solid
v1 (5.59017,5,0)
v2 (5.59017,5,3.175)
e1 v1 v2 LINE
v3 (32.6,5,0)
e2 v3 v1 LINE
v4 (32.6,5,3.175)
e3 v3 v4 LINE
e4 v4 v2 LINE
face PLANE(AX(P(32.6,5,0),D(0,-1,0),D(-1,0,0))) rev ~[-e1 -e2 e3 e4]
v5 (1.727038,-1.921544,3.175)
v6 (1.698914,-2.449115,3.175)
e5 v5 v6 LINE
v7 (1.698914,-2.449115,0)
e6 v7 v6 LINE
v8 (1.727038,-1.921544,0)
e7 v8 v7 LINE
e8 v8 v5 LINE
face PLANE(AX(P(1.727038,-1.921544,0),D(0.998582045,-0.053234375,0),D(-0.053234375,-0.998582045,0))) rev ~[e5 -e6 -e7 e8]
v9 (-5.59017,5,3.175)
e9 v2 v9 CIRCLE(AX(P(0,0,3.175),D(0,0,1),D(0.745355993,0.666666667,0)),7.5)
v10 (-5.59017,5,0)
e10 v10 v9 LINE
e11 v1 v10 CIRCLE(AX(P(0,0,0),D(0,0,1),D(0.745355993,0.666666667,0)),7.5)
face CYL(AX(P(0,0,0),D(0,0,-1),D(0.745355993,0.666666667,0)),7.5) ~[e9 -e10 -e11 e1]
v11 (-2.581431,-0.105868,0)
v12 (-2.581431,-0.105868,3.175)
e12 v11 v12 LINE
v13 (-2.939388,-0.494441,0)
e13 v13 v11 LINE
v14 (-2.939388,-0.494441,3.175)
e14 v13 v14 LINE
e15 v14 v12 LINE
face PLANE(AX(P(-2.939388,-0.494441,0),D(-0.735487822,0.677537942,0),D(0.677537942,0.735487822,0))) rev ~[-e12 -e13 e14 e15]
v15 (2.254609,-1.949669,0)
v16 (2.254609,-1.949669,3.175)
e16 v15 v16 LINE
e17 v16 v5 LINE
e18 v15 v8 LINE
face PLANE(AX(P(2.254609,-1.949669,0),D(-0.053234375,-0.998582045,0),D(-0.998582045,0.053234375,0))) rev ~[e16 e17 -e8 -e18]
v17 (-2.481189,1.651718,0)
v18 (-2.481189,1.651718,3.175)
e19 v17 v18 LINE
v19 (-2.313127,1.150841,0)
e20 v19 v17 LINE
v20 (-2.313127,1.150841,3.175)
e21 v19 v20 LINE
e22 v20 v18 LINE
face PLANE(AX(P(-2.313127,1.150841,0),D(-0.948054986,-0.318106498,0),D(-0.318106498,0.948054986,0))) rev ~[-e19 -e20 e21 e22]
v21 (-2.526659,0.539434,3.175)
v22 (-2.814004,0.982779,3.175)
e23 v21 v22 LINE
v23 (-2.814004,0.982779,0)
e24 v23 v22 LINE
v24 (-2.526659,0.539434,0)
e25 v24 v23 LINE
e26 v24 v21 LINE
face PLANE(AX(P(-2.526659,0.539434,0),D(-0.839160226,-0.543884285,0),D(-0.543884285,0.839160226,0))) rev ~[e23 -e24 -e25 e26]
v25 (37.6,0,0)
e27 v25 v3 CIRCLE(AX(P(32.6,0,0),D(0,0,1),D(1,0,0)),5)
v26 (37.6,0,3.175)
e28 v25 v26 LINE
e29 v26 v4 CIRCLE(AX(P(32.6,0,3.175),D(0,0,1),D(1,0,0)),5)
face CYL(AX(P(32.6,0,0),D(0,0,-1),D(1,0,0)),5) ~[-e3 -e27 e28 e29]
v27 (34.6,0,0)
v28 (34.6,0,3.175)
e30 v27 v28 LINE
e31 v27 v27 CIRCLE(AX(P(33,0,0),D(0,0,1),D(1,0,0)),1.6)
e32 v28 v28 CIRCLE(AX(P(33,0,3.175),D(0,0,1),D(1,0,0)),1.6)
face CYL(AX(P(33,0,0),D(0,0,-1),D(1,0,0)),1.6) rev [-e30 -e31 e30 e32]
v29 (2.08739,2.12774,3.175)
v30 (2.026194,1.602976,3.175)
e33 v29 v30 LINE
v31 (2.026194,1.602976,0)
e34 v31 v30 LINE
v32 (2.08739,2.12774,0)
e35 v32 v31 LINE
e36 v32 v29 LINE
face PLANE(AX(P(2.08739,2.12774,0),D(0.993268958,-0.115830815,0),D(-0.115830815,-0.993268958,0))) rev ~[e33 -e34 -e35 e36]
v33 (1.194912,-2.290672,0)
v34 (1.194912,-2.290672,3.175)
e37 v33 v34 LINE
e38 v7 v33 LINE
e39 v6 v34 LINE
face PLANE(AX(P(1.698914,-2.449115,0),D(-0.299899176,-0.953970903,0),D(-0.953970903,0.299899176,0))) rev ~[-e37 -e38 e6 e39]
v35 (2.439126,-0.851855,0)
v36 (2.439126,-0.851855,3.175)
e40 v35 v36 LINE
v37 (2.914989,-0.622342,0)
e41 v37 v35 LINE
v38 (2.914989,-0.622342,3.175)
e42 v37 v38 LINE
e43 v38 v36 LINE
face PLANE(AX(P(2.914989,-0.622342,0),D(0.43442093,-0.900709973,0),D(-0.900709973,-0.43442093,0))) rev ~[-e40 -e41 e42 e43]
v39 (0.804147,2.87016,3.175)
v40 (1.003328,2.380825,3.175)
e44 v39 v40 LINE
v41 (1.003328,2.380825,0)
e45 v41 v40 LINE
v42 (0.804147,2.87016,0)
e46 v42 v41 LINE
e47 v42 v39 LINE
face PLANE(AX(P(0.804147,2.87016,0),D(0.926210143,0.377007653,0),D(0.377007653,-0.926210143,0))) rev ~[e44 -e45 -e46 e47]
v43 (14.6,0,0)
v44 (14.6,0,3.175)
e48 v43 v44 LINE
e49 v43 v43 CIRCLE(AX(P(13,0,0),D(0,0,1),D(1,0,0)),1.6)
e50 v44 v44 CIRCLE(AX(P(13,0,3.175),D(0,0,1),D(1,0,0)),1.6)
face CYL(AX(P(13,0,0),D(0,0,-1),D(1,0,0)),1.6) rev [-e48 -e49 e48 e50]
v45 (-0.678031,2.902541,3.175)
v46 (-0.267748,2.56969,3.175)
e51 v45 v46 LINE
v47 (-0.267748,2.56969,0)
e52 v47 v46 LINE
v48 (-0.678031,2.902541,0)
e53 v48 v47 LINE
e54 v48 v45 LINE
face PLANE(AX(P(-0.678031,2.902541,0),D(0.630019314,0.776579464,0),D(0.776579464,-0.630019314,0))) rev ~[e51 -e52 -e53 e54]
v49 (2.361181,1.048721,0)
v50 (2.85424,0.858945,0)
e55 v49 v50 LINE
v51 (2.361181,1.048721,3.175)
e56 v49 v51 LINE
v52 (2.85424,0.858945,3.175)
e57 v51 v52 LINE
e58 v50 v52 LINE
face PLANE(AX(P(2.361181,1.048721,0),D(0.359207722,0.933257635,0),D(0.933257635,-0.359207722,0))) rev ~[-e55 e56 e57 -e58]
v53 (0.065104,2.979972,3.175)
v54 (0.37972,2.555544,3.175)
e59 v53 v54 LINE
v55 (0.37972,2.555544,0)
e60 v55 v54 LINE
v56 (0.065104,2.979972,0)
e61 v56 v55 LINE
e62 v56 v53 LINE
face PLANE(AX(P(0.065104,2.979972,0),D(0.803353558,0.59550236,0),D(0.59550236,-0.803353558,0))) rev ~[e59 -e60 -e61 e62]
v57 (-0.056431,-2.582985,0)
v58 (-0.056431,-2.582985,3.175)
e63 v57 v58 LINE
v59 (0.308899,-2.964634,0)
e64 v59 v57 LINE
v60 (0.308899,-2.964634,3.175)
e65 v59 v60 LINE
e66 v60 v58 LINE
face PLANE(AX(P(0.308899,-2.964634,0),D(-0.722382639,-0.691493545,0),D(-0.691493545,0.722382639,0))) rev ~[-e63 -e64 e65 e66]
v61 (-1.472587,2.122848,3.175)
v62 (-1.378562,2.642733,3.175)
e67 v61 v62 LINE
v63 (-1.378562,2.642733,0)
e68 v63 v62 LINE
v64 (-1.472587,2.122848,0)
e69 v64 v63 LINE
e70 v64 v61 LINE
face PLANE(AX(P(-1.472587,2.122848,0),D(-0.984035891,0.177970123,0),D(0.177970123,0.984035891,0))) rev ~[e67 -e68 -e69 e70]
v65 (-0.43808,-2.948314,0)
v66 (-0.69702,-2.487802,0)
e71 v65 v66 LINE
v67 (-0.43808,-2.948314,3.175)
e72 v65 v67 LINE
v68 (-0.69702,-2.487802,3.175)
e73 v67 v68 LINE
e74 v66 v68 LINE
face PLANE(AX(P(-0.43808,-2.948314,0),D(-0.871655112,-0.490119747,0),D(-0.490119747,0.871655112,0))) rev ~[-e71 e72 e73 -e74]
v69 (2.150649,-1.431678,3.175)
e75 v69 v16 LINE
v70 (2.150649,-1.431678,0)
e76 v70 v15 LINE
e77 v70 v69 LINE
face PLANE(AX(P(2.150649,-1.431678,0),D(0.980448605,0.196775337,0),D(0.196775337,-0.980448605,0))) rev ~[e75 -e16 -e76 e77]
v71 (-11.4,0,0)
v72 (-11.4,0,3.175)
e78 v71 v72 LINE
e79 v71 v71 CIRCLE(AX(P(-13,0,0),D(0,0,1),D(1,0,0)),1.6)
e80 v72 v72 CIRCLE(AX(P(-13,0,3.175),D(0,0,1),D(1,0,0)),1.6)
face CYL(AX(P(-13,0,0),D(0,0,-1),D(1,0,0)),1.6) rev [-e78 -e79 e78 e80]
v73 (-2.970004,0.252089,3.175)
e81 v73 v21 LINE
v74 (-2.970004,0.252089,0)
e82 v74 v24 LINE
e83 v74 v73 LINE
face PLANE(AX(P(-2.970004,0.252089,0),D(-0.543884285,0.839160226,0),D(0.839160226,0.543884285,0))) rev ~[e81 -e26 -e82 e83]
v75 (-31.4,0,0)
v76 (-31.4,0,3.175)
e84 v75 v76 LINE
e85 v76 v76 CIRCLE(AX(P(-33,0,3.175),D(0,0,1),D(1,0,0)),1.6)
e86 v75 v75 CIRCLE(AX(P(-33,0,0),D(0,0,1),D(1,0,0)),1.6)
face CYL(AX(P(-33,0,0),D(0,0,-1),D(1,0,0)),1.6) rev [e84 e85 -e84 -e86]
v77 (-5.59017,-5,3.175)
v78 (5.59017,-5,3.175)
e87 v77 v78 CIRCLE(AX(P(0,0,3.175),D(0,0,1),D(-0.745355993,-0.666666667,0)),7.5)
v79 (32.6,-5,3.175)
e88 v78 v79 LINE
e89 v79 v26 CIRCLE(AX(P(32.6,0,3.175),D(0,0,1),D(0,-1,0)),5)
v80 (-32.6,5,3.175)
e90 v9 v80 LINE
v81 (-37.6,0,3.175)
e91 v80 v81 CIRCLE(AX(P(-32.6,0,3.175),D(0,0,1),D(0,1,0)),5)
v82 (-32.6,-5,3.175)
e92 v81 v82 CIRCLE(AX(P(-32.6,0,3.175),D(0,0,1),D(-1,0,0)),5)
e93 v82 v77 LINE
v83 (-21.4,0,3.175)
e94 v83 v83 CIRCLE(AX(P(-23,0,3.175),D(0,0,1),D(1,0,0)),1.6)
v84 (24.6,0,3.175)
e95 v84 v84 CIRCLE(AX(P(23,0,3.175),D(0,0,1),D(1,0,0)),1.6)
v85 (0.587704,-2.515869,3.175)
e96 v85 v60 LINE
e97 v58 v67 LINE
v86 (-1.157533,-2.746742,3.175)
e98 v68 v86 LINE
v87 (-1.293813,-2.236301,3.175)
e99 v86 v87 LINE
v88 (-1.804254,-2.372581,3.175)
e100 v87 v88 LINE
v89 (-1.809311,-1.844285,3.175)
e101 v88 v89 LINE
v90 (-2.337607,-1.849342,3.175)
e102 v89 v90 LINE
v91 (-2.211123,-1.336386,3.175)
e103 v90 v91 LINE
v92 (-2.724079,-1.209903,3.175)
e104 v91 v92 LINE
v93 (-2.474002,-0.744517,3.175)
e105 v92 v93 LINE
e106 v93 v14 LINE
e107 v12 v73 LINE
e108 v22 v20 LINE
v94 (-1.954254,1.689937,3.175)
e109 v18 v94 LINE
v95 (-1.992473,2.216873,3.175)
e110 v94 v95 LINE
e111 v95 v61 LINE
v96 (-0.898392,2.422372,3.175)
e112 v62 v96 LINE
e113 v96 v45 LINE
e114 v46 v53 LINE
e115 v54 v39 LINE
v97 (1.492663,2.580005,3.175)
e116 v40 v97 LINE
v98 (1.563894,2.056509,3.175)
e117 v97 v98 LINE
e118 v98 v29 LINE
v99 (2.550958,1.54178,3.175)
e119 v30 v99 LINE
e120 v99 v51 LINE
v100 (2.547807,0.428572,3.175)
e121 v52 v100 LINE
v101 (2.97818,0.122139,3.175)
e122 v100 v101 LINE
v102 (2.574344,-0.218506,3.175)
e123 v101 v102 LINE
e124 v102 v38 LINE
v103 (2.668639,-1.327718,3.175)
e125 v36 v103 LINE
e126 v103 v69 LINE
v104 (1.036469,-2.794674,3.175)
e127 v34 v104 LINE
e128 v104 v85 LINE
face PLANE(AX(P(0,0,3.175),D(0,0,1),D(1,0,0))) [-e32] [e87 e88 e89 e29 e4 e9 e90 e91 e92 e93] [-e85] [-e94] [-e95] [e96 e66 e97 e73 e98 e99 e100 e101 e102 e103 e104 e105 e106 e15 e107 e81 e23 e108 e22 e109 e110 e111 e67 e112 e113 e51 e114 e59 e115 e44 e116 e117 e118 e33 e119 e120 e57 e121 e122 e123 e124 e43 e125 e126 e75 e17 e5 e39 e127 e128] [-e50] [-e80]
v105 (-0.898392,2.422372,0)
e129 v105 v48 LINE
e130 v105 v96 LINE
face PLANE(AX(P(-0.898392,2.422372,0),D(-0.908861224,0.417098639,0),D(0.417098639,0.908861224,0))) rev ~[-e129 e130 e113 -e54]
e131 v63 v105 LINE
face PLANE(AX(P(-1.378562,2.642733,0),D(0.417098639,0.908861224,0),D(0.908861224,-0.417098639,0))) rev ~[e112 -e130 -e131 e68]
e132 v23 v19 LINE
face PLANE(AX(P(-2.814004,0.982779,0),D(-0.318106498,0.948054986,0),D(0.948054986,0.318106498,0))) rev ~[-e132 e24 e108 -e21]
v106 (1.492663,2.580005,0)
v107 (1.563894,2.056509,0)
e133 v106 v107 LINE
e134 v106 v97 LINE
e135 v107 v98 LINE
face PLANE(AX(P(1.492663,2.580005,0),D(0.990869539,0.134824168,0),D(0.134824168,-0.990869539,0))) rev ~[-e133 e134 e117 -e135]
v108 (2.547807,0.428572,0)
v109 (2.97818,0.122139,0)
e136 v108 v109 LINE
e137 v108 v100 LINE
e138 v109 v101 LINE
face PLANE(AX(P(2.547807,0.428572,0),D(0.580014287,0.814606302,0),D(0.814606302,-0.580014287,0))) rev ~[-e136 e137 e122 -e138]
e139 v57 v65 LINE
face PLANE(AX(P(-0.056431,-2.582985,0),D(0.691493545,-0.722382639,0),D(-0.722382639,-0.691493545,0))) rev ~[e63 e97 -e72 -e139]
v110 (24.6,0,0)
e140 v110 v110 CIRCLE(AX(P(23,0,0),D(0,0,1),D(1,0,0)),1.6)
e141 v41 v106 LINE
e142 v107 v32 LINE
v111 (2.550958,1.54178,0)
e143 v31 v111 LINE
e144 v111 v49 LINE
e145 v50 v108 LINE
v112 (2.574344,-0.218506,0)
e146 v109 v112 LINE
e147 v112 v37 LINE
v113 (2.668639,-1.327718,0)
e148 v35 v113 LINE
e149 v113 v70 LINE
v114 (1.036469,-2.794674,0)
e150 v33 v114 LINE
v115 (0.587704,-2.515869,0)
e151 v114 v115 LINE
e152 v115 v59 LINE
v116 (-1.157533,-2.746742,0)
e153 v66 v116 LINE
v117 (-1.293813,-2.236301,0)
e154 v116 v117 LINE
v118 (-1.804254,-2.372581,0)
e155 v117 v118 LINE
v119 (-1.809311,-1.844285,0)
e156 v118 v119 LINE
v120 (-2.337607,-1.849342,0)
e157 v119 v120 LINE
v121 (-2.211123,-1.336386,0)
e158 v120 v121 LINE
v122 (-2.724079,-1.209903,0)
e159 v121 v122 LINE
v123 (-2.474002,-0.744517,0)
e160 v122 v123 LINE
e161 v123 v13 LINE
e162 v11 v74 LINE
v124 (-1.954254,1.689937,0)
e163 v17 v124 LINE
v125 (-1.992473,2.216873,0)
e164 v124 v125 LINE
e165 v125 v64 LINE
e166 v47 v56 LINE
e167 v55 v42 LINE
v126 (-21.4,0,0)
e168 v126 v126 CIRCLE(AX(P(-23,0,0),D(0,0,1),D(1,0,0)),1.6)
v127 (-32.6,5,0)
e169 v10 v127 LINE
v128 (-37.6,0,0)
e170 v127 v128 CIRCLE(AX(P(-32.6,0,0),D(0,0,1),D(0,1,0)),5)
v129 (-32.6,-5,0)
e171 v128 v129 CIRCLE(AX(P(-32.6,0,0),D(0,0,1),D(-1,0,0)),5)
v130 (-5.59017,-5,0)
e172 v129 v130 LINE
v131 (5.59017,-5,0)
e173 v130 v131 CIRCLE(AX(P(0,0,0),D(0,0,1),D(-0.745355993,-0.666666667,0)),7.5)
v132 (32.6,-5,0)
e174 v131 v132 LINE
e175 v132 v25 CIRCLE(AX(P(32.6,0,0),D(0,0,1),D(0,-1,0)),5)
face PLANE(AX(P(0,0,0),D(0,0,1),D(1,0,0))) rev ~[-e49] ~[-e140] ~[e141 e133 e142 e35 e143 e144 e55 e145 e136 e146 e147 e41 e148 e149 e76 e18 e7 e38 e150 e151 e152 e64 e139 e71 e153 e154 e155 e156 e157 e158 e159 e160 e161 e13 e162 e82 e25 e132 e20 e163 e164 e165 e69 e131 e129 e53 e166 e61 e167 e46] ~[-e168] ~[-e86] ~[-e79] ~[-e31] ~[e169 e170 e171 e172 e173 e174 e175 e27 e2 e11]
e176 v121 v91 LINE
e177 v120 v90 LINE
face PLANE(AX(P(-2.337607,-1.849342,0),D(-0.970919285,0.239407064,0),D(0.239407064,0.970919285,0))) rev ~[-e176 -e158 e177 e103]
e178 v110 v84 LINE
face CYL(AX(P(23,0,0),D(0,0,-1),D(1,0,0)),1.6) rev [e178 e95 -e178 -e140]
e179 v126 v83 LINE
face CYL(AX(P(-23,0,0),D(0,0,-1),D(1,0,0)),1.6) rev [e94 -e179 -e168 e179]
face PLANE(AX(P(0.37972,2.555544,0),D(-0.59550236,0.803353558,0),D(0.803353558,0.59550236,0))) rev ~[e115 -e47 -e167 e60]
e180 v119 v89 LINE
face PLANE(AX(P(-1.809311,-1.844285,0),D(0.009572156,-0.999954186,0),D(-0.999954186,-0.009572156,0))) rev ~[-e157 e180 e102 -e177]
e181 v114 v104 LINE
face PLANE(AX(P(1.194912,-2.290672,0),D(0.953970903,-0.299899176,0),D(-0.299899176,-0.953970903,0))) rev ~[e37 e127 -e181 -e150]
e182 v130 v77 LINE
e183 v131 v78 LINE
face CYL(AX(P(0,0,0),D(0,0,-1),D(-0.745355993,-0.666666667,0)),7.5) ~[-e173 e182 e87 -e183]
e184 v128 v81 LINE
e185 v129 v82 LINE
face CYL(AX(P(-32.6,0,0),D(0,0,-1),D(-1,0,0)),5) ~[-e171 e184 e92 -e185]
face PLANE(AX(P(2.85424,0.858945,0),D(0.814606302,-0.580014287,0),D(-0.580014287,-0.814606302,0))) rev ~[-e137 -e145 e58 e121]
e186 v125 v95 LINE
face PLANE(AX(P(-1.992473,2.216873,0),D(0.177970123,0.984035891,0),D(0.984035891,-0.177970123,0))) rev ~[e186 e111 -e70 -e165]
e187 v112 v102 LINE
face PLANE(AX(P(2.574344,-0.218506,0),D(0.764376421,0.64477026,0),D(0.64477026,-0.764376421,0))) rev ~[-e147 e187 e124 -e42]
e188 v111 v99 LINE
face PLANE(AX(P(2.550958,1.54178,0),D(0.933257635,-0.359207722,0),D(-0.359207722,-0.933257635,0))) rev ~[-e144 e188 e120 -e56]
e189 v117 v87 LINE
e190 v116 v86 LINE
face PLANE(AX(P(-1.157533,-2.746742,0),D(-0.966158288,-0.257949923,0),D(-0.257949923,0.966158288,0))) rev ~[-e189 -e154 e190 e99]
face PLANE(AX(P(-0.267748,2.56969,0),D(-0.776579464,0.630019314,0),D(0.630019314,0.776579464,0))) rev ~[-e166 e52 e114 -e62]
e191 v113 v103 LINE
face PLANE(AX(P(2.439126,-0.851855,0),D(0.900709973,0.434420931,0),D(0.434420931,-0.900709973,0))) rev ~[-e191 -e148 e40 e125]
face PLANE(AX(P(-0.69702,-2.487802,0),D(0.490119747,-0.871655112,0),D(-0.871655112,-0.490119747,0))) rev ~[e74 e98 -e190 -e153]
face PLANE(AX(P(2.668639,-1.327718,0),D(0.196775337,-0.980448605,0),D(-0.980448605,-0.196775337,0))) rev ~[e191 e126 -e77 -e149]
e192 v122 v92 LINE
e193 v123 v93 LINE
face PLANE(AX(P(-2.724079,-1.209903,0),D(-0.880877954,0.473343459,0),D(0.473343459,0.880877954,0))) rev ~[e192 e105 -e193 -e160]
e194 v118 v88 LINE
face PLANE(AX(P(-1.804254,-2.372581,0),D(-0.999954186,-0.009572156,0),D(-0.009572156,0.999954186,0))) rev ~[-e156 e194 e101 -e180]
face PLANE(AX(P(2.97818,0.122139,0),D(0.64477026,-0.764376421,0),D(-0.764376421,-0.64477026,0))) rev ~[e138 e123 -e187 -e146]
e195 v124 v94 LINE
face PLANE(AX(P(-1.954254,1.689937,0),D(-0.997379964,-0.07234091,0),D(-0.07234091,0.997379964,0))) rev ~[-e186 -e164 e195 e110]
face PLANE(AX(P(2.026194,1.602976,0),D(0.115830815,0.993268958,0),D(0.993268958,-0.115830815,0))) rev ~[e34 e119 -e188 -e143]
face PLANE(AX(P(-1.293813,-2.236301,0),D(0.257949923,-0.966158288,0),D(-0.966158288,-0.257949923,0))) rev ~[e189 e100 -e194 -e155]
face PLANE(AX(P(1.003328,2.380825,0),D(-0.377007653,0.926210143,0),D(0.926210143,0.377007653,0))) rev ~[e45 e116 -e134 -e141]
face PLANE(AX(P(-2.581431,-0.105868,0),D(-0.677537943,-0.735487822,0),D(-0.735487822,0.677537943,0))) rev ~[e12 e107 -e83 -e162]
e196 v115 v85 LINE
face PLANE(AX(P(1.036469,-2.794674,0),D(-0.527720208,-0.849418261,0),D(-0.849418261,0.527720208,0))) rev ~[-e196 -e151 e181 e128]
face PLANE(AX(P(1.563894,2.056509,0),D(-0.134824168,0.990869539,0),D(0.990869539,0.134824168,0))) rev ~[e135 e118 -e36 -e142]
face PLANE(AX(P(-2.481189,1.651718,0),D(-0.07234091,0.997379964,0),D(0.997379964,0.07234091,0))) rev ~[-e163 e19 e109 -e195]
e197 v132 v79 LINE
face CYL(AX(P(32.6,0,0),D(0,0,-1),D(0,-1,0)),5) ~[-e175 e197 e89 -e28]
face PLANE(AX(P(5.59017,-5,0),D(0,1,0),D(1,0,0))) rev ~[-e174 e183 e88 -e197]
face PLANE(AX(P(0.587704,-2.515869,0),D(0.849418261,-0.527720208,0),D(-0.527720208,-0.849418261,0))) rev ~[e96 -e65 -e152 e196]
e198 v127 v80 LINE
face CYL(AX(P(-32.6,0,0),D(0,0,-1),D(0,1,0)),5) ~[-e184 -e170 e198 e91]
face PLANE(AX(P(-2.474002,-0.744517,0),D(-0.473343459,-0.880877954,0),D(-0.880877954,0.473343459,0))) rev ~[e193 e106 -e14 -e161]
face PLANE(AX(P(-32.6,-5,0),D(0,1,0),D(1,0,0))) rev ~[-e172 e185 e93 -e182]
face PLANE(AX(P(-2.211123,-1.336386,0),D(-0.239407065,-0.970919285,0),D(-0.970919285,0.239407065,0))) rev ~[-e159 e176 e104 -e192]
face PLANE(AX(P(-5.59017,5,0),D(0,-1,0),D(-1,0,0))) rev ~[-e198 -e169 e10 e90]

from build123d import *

# Parameters (mm, degrees)
F0_R     = 1.6
F1_DEPTH = 3.175


with BuildPart() as f1:
    # F0 (on Top) → F1 (new body)
    with BuildSketch(Plane.XY):
        with BuildLine():
            ThreePointArc((5.5901699437, 5), (0, 7.5), (-5.5901699437, 5))
            Line((-5.5901699437, 5), (-32.6, 5))
            ThreePointArc((-32.6, 5), (-36.1355339059, 3.5355339059), (-37.6, 0))
            ThreePointArc((-37.6, 0), (-36.1355339059, -3.5355339059), (-32.6, -5))
            Line((-32.6, -5), (-5.5901699437, -5))
            ThreePointArc((-5.5901699437, -5), (0, -7.5), (5.5901699437, -5))
            Line((5.5901699437, -5), (32.6, -5))
            ThreePointArc((32.6, -5), (36.1355339059, -3.5355339059), (37.6, 0))
            ThreePointArc((37.6, 0), (36.1355339059, 3.5355339059), (32.6, 5))
            Line((32.6, 5), (5.5901699437, 5))
        make_face()
        with Locations((-33, 0)):
            Circle(F0_R, mode=Mode.SUBTRACT)
        with Locations((-23, 0)):
            Circle(F0_R, mode=Mode.SUBTRACT)
        with Locations((-13, 0)):
            Circle(F0_R, mode=Mode.SUBTRACT)
        Polygon((-2.3131272616, 1.150841372), (-2.4811892868, 1.651717782), (-1.9542535042, 1.6899369317), (-1.992472654, 2.2168727143), (-1.4725868119, 2.1228475389), (-1.3785616365, 2.6427333809), (-0.8983920744, 2.4223718279), (-0.6780305213, 2.90254139), (-0.2677480588, 2.5696895861), (0.0651037451, 2.9799720486), (0.379719552, 2.555544297), (0.8041473037, 2.8701601039), (1.0033279869, 2.380824761), (1.4926633298, 2.5800054442), (1.5638936344, 2.0565092492), (2.0873898293, 2.1277395538), (2.0261940932, 1.6029756981), (2.5509579489, 1.5417799619), (2.3611813253, 1.0487212884), (2.8542399989, 0.8589446648), (2.547806851, 0.4285718633), (2.9781796525, 0.1221387154), (2.574344302, -0.2185063082), (2.9149893256, -0.6223416587), (2.4391262327, -0.8518549247), (2.6686394987, -1.3277180175), (2.1506488918, -1.4316783634), (2.2546092377, -1.9496689703), (1.7270383715, -1.9215441851), (1.6989135863, -2.4491150513), (1.1949116786, -2.2906723188), (1.0364689461, -2.7946742265), (0.5877042905, -2.5158690862), (0.3088991502, -2.9646337418), (-0.0564307197, -2.5829845462), (-0.4380799154, -2.9483144161), (-0.6970199802, -2.4878015876), (-1.1575328087, -2.7467416524), (-1.2938129119, -2.2363009057), (-1.8042536586, -2.3725810089), (-1.80931082, -1.8442852134), (-2.3376066155, -1.8493423749), (-2.2111230752, -1.3363862984), (-2.7240791517, -1.209902758), (-2.4740023355, -0.7445173173), (-2.9393877762, -0.4944405012), (-2.5814309304, -0.105867575), (-2.9700038565, 0.2520892708), (-2.5266587261, 0.5394342163), (-2.8140036716, 0.9827793468), align=None, mode=Mode.SUBTRACT)
        with Locations((13, 0)):
            Circle(F0_R, mode=Mode.SUBTRACT)
        with Locations((23, 0)):
            Circle(F0_R, mode=Mode.SUBTRACT)
        with Locations((33, 0)):
            Circle(F0_R, mode=Mode.SUBTRACT)
    extrude(amount=F1_DEPTH)


solid = f1.part
